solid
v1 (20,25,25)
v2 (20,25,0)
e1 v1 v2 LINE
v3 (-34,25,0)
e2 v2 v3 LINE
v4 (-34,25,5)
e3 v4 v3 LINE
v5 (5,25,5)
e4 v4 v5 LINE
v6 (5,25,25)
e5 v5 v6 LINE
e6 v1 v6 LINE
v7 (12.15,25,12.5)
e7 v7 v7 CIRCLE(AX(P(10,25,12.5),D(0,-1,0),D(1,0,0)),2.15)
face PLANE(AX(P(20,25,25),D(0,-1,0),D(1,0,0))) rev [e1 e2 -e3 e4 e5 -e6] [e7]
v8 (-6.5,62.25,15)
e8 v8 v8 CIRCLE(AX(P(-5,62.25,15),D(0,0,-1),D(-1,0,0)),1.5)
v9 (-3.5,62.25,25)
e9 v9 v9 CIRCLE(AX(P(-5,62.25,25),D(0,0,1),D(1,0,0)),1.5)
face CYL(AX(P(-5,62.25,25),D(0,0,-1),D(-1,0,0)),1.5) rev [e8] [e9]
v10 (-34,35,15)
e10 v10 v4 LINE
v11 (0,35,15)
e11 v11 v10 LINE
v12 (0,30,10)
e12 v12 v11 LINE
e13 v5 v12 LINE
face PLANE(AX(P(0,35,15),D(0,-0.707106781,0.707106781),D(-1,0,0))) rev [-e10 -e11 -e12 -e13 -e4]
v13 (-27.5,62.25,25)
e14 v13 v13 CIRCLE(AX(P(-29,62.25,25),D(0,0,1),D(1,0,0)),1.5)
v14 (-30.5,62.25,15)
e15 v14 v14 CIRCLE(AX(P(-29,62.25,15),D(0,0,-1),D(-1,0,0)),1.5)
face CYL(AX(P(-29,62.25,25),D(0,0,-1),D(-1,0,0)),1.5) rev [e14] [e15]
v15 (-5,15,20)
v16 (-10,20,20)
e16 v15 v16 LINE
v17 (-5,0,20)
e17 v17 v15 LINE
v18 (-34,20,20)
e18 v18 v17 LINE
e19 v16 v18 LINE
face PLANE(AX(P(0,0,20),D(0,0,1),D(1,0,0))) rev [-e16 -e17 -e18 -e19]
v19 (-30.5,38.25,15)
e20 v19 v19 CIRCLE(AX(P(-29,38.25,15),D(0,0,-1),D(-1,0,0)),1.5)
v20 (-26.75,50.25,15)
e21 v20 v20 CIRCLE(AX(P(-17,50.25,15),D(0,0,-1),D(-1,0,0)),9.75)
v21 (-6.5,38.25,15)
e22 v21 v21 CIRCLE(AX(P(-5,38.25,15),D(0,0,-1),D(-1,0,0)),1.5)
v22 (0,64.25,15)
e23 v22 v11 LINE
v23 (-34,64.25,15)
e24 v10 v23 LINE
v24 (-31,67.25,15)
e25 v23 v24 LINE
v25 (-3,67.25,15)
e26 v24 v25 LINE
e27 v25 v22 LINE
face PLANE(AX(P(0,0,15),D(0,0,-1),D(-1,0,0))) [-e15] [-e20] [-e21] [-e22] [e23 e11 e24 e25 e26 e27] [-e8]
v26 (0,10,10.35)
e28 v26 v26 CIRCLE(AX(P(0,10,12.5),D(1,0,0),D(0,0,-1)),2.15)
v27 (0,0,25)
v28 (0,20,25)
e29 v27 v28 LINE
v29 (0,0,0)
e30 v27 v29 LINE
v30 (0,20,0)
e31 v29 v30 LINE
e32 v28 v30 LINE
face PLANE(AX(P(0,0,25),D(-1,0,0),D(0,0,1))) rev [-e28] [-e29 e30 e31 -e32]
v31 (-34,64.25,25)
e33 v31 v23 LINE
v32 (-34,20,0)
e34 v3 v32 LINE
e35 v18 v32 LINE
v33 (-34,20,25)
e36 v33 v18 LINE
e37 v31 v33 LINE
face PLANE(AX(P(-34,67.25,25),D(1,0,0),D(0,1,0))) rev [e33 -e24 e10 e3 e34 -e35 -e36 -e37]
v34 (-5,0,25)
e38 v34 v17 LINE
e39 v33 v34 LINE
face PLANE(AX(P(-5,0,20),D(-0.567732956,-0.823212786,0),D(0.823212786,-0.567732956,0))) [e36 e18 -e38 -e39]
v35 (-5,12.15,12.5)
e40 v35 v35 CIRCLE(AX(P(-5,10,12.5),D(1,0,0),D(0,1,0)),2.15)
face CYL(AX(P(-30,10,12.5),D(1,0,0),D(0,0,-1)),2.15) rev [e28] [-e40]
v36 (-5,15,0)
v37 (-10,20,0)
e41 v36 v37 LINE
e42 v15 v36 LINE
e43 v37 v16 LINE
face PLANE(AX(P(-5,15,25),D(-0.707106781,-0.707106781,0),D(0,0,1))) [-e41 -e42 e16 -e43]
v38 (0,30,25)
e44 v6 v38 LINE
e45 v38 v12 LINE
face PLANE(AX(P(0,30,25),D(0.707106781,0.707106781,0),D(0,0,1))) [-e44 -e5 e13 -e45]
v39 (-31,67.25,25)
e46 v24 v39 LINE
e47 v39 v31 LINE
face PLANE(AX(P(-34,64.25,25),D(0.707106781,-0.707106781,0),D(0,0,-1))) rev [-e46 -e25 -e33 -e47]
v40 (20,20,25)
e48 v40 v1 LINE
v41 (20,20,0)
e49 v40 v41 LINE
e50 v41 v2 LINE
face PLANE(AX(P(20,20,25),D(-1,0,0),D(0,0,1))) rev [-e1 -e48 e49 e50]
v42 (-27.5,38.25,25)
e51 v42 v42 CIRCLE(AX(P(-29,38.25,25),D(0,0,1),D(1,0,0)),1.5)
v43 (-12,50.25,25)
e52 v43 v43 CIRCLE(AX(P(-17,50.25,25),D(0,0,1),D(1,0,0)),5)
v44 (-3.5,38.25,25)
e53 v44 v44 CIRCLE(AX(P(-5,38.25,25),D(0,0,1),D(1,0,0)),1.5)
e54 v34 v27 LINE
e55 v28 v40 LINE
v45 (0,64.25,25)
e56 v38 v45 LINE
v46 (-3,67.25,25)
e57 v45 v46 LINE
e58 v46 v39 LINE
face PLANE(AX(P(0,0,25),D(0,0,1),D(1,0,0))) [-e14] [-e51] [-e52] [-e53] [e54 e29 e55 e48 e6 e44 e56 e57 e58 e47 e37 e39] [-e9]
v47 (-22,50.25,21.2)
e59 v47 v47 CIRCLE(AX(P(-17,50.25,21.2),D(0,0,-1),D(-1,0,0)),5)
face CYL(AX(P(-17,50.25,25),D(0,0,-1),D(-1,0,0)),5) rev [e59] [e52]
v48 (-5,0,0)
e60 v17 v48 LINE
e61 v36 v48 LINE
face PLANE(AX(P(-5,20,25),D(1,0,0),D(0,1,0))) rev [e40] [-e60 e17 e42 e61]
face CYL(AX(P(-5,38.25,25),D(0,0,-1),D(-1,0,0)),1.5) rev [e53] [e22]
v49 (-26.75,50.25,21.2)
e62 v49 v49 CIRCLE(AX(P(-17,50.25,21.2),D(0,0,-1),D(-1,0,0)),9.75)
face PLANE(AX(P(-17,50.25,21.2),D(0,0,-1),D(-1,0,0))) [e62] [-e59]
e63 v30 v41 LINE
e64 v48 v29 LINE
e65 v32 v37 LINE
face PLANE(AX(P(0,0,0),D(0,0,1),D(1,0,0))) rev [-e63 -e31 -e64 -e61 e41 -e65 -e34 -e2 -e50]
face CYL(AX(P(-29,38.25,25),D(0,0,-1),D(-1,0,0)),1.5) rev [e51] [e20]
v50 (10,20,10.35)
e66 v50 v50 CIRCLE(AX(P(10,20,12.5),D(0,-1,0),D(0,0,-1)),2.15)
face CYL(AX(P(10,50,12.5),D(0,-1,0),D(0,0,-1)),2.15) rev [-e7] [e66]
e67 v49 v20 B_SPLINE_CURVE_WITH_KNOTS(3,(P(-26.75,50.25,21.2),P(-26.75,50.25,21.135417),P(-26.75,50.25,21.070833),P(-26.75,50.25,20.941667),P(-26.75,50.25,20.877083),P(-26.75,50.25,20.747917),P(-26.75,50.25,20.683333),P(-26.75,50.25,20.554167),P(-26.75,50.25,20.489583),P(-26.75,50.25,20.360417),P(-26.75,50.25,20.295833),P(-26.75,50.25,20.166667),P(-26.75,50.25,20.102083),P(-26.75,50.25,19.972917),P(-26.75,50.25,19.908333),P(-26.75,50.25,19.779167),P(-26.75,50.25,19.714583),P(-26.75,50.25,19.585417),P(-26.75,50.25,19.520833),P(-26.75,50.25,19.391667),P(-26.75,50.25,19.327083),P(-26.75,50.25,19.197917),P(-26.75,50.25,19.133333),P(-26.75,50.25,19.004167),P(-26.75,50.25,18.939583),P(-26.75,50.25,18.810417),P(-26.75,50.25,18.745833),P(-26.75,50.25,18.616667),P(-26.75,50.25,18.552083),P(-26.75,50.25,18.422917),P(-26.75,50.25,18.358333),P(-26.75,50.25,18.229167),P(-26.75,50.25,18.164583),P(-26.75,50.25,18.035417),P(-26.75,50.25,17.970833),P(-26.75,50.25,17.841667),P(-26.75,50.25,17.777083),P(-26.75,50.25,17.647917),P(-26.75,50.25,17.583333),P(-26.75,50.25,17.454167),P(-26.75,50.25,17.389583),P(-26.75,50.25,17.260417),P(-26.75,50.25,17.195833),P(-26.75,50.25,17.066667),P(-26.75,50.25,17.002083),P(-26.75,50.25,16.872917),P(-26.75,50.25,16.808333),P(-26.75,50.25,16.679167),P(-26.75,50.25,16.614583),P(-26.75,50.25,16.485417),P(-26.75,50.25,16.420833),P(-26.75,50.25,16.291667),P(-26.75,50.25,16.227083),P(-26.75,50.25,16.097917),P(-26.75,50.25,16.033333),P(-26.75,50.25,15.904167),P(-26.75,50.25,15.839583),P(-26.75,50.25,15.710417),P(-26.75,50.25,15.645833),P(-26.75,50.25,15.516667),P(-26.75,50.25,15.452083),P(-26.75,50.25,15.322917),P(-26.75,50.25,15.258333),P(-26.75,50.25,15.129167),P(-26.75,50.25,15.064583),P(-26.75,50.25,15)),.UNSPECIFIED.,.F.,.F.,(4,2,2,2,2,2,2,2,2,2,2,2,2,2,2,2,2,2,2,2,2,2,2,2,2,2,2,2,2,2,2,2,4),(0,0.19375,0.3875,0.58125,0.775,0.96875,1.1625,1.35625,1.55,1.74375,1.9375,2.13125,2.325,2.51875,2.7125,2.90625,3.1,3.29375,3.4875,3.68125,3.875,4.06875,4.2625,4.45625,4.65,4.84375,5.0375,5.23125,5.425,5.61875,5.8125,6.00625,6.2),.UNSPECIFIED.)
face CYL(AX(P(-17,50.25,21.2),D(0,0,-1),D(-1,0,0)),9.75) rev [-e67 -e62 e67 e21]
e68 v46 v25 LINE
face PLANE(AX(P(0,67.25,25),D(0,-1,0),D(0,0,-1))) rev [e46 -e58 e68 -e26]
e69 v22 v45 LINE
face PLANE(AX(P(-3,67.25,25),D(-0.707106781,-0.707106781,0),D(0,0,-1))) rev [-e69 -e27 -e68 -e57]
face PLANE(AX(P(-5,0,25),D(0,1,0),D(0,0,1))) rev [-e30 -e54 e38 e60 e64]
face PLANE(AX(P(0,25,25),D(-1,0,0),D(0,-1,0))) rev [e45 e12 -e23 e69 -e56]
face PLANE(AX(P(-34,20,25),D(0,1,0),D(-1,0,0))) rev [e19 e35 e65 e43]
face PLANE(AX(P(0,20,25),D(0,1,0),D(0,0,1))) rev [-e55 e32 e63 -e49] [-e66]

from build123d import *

# Parameters (mm, degrees)
SKETCH_1_R          = 5
SKETCH_1_R_2        = 1.5
EXTRUDE_1_DEPTH     = 25
SKETCH_2_R          = 2.15
CUT_EXTRUDE_1_DEPTH = 30
SKETCH_3_R          = 2.15
CUT_EXTRUDE_2_DEPTH = 30
SKETCH_4_W          = 34
SKETCH_4_H          = 42.25
CUT_EXTRUDE_3_DEPTH = 15
CHAMFER_1_SIZE      = 5
CHAMFER_2_SIZE      = 3
SKETCH_6_R          = 9.75
CUT_EXTRUDE_5_DEPTH = 6.2
EXTRUDE_2_DEPTH     = 5
CHAMFER_3_SIZE      = 10


with BuildPart() as part:
    # 草图1 → 凸台-拉伸1 (new body)
    with BuildSketch(Plane.XY):
        Polygon((0, 0), (0, 20), (20, 20), (20, 25), (0, 25), (0, 67.25), (-34, 67.25), (-34, 20), (-5, 20), (-5, 0), align=None)
        with Locations((-17, 50.25)):
            Circle(SKETCH_1_R, mode=Mode.SUBTRACT)
        with Locations((-29, 62.25)):
            Circle(SKETCH_1_R_2, mode=Mode.SUBTRACT)
        with Locations((-5, 62.25)):
            Circle(SKETCH_1_R_2, mode=Mode.SUBTRACT)
        with Locations((-29, 38.25)):
            Circle(SKETCH_1_R_2, mode=Mode.SUBTRACT)
        with Locations((-5, 38.25)):
            Circle(SKETCH_1_R_2, mode=Mode.SUBTRACT)
    extrude(amount=EXTRUDE_1_DEPTH)

    # 草图2 → 切除-拉伸1 (cut)
    with BuildSketch(Plane(origin=(0, 0, 0), x_dir=(0, 0, -1), z_dir=(1, 0, 0))):
        with Locations((-12.5, 10)):
            Circle(SKETCH_2_R)
    extrude(amount=-CUT_EXTRUDE_1_DEPTH, mode=Mode.SUBTRACT)

    # 草图3 → 切除-拉伸2 (cut)
    with BuildSketch(Plane.XZ.offset(-20)):
        with Locations(Location((10, 12.5, 0), (0, 0, 270))):
            Circle(SKETCH_3_R)
    extrude(amount=-CUT_EXTRUDE_2_DEPTH, mode=Mode.SUBTRACT)

    # 草图4 → 切除-拉伸3 (cut)
    with BuildSketch(Plane(origin=(0, 0, 0), x_dir=(-1, 0, 0), z_dir=(0, 0, -1))):
        with Locations((17, 46.125)):
            Rectangle(SKETCH_4_W, SKETCH_4_H)
    extrude(amount=-CUT_EXTRUDE_3_DEPTH, mode=Mode.SUBTRACT)

    # 倒角1
    chamfer_1_edges = [part.edges().sort_by_distance(p)[0] for p in [
        (-5, 20, 12.5),
        (0, 25, 20),
    ]]
    chamfer(chamfer_1_edges, length=CHAMFER_1_SIZE)

    # 倒角2
    chamfer_2_edges = [part.edges().sort_by_distance(p)[0] for p in [
        (-34, 67.25, 20),
        (0, 67.25, 20),
    ]]
    chamfer(chamfer_2_edges, length=CHAMFER_2_SIZE)

    # 草图6 → 切除-拉伸5 (cut)
    with BuildSketch(Plane(origin=(0, 0, 15), x_dir=(-1, 0, 0), z_dir=(0, 0, -1))):
        with Locations((17, 50.25)):
            Circle(SKETCH_6_R)
    extrude(amount=-CUT_EXTRUDE_5_DEPTH, mode=Mode.SUBTRACT)

    # 草图7 → 凸台-拉伸2 (add)
    with BuildSketch(Plane.XY.offset(25)):
        Polygon((-34, 20), (-10, 20), (-5, 15), (-5, 0), align=None)
    extrude(amount=-EXTRUDE_2_DEPTH)

    # 倒角3
    # the kernel refuses this chamfer: 10 mm, written as the material it adds along each edge
    with BuildSketch(Plane(origin=(-34, 25, 15), x_dir=(0, 0.9996219169112968, 0.027495876610586317), z_dir=(1, 0, 0))) as chamfer_3_piece_1_section:
        Polygon((CHAMFER_3_SIZE * 0.999621916911, -CHAMFER_3_SIZE * 0.0274958766106), (-CHAMFER_3_SIZE * 0.0274958766106, -CHAMFER_3_SIZE * 0.999621916911), (0, 0), align=None)
    chamfer_3_piece_1 = extrude(amount=64.71682988, mode=Mode.PRIVATE)
    chamfer_3_piece_1 = split(chamfer_3_piece_1, bisect_by=Plane(origin=(0, 28.236246517, 11.669766102), z_dir=(-1, 0, 0)), keep=Keep.TOP, mode=Mode.PRIVATE)
    chamfer_3_piece_1 = split(chamfer_3_piece_1, bisect_by=Plane(origin=(-7.726936811, 37.726936811, 11.669766102), z_dir=(-0.7071067811865476, -0.7071067811865476, 0)), keep=Keep.TOP, mode=Mode.PRIVATE)
    add(chamfer_3_piece_1)
    with BuildSketch(Plane(origin=(-34, 25, 15), x_dir=(0, 0.9996219169112968, 0.027495876610586317), z_dir=(1, 0, 0))) as chamfer_3_piece_2_section:
        Polygon((CHAMFER_3_SIZE * 0.999621916911, -CHAMFER_3_SIZE * 0.0274958766106), (-CHAMFER_3_SIZE * 0.0274958766106, -CHAMFER_3_SIZE * 0.999621916911), (0, 0), align=None)
    chamfer_3_piece_2 = extrude(amount=64.71682988, mode=Mode.PRIVATE)
    chamfer_3_piece_2 = split(chamfer_3_piece_2, bisect_by=Plane(origin=(0, 26.323776193, 10.636124878), z_dir=(1, 0, 0)), keep=Keep.TOP, mode=Mode.PRIVATE)
    chamfer_3_piece_2 = split(chamfer_3_piece_2, bisect_by=Plane(origin=(2.757167855, 27.242832145, 10.636124878), z_dir=(-0.7071067811865476, -0.7071067811865476, 0)), keep=Keep.TOP, mode=Mode.PRIVATE)
    add(chamfer_3_piece_2)
    with BuildSketch(Plane(origin=(-34, 25, 15), x_dir=(0, 0.9996219169112968, 0.027495876610586317), z_dir=(1, 0, 0))) as chamfer_3_piece_3_section:
        Polygon((CHAMFER_3_SIZE * 0.999621916911, -CHAMFER_3_SIZE * 0.0274958766106), (-CHAMFER_3_SIZE * 0.0274958766106, -CHAMFER_3_SIZE * 0.999621916911), (0, 0), align=None)
    chamfer_3_piece_3 = extrude(amount=64.71682988, mode=Mode.PRIVATE)
    chamfer_3_piece_3 = split(chamfer_3_piece_3, bisect_by=Plane(origin=(0, 32.729927819, 14.022430088), z_dir=(-1, 0, 0)), keep=Keep.TOP, mode=Mode.PRIVATE)
    chamfer_3_piece_3 = split(chamfer_3_piece_3, bisect_by=Plane(origin=(-2.047445864, 32.047445864, 14.022430088), z_dir=(0.7071067811865476, 0.7071067811865476, 0)), keep=Keep.TOP, mode=Mode.PRIVATE)
    add(chamfer_3_piece_3)


solid = part.part
